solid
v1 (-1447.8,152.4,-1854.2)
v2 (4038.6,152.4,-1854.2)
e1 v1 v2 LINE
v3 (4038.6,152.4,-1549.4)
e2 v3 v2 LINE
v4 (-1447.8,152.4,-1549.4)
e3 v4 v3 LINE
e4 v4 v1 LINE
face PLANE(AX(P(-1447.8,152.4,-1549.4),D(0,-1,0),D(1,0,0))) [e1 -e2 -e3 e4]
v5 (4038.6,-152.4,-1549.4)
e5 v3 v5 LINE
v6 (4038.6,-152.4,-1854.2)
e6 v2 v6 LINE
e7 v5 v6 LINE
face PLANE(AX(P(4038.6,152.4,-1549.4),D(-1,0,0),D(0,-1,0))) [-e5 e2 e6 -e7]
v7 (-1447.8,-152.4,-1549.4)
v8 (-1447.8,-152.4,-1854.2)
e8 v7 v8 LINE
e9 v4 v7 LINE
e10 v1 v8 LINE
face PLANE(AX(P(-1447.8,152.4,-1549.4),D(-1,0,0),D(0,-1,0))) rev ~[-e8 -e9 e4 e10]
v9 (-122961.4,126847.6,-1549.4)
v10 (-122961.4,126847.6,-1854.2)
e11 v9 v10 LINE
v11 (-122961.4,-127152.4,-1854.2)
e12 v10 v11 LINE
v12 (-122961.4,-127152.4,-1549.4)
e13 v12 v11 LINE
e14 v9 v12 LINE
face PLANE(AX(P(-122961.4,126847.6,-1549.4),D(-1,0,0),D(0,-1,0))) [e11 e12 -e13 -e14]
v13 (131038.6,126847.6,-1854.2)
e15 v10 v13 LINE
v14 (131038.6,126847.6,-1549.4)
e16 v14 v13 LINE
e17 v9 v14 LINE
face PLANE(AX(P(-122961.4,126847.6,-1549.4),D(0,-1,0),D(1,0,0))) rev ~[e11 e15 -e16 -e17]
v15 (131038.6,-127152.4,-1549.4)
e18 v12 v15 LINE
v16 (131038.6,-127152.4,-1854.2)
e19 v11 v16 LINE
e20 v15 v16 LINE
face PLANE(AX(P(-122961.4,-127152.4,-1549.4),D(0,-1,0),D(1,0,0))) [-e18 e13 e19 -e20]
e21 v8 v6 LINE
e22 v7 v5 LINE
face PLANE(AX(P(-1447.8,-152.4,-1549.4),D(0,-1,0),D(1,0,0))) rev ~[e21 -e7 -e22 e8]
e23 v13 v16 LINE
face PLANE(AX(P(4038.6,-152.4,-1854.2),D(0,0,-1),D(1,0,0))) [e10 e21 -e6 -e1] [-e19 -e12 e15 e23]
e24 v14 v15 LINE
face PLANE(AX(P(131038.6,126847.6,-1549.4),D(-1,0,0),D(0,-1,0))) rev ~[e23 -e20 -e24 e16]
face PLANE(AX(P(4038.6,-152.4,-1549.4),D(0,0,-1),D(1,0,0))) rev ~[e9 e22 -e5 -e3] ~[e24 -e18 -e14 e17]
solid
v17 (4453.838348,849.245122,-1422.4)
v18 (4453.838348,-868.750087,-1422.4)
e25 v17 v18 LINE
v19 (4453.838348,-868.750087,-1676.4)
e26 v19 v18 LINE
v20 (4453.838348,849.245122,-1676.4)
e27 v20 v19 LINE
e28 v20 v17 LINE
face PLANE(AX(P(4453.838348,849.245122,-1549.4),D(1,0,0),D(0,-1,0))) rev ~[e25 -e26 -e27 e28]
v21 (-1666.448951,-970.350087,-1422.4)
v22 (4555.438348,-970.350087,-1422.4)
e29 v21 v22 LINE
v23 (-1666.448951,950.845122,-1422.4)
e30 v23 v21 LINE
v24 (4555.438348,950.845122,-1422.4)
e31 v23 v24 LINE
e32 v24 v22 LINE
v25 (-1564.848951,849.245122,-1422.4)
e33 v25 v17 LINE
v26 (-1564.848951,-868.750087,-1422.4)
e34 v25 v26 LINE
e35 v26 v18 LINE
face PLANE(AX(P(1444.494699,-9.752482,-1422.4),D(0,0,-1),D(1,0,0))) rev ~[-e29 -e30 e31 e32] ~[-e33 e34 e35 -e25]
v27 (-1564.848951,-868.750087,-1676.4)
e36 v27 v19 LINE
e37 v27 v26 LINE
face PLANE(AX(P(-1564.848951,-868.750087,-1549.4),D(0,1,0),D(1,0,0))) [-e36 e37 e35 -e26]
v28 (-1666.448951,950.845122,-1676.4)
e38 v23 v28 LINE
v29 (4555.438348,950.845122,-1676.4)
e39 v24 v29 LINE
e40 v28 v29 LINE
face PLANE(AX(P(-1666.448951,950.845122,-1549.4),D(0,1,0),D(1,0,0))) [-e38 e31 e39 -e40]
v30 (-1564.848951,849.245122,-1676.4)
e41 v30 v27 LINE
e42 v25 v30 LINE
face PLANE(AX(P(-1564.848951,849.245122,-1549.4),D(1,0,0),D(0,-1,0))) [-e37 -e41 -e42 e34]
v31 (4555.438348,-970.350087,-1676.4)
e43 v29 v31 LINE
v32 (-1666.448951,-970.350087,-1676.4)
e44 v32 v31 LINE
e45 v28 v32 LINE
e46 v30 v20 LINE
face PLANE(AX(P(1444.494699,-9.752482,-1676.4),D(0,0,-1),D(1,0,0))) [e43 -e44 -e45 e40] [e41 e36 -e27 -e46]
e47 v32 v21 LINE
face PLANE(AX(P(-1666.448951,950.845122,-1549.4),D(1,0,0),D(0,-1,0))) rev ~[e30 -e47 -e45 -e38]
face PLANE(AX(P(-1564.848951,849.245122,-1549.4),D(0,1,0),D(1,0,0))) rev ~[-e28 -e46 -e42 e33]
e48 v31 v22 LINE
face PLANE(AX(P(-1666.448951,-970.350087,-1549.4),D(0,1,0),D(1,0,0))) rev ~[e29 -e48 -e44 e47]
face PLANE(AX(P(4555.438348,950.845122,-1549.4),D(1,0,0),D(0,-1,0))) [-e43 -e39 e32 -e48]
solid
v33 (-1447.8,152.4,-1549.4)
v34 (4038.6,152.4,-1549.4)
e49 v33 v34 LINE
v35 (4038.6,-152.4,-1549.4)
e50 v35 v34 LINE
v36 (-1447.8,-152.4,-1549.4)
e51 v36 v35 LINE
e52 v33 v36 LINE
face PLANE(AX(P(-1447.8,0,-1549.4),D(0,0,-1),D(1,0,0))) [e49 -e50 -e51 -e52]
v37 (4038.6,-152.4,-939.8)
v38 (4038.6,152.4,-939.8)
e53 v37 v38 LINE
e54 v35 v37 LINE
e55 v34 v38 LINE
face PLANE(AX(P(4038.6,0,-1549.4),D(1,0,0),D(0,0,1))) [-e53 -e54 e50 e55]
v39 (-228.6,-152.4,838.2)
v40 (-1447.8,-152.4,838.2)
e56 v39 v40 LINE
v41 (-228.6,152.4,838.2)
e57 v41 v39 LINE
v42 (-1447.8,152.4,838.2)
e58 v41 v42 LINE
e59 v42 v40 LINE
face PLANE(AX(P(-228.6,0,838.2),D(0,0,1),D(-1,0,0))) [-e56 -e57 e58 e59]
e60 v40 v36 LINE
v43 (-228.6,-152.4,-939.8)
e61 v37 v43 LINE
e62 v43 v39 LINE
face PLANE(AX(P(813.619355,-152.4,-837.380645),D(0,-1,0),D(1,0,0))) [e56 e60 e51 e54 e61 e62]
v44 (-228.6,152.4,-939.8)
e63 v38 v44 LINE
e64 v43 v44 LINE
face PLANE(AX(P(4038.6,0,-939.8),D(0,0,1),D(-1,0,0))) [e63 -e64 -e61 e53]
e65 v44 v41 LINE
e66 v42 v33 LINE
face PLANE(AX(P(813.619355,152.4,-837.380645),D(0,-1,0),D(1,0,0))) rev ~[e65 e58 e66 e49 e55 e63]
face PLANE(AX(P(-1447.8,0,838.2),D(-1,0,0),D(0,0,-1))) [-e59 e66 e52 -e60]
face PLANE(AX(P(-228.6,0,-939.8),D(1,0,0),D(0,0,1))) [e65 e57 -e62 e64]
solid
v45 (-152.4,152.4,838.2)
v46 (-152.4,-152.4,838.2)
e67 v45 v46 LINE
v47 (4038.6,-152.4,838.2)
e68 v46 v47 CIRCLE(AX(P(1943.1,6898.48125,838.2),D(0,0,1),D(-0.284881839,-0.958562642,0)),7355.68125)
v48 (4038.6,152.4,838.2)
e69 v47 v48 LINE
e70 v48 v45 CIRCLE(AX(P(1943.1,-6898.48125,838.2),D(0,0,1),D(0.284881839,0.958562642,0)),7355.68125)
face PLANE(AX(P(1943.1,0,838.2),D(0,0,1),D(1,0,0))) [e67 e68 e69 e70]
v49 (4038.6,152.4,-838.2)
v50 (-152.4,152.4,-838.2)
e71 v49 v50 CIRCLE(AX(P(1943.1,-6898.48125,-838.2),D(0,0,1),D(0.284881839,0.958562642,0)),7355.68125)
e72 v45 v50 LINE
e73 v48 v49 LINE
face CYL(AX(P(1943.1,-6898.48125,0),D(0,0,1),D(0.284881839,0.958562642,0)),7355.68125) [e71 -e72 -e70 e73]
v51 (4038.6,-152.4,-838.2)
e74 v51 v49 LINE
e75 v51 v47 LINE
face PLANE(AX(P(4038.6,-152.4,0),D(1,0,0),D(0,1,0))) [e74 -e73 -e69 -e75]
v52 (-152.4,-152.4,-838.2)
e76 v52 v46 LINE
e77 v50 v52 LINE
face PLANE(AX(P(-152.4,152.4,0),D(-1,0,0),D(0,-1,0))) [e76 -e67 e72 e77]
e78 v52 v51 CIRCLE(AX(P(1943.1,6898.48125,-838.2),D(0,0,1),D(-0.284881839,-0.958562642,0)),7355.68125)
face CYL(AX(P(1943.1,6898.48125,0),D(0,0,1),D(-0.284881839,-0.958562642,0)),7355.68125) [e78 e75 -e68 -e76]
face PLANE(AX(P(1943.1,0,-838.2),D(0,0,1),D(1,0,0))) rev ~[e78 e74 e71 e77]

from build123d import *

# Parameters (mm, degrees)
F1_DEPTH = 838.2
F3_DEPTH = 152.4
F4_W     = 6221.8872991562
F4_H     = 1921.1952090263
F4_W_2   = 6018.6872991562
F4_H_2   = 1717.9952090263
F5_DEPTH = 127
F6_W     = 254000
F6_H     = 254000
F6_W_2   = 5486.4
F6_H_2   = 304.8
F7_DEPTH = 304.8


# Not quite as in the source:
# - a feature names something its author has since deleted; it is built from what else it names


with BuildPart() as f1:
    # F0 (on Top) → F1 (new body, symmetric)
    with BuildSketch(Plane.XY):
        with BuildLine():
            Line((-152.4, 152.4), (-152.4, 0))
            Line((-152.4, 0), (-152.4, -152.4))
            ThreePointArc((-152.4, -152.4), (1943.1, -457.2), (4038.6, -152.4))
            Line((4038.6, -152.4), (4038.6, 152.4))
            ThreePointArc((4038.6, 152.4), (1943.1, 457.2), (-152.4, 152.4))
        make_face()
    extrude(amount=F1_DEPTH, both=True)


with BuildPart() as f3:
    # F2 (on Front) → F3 (new body, symmetric)
    with BuildSketch(Plane.XZ):
        Polygon((-228.6, -939.8), (-228.6, 0), (-228.6, 838.2), (-1447.8, 838.2), (-1447.8, -1549.4), (4038.6, -1549.4), (4038.6, -939.8), align=None)
    extrude(amount=F3_DEPTH, both=True)


with BuildPart() as f5:
    # F4 (on face) → F5 (new body, symmetric)
    with BuildSketch(Plane(origin=(0, 0, -1549.4), x_dir=(1, 0, 0), z_dir=(0, 0, -1))):
        with Locations((1444.4946988106, 9.7524821758)):
            Rectangle(F4_W, F4_H)
        with Locations((1444.4946988106, 9.7524821758)):
            Rectangle(F4_W_2, F4_H_2, mode=Mode.SUBTRACT)
    extrude(amount=F5_DEPTH, both=True)


with BuildPart() as f7:
    # F6 (on face) → F7 (new body)
    with BuildSketch(Plane(origin=(0, 0, -1549.4), x_dir=(1, 0, 0), z_dir=(0, 0, -1))):
        with Locations((4038.6, 152.4)):
            Rectangle(F6_W, F6_H)
        with Locations((1295.4, 0)):
            Rectangle(F6_W_2, F6_H_2, mode=Mode.SUBTRACT)
    extrude(amount=F7_DEPTH)


solid = Compound([f1.part, f3.part, f5.part, f7.part])
